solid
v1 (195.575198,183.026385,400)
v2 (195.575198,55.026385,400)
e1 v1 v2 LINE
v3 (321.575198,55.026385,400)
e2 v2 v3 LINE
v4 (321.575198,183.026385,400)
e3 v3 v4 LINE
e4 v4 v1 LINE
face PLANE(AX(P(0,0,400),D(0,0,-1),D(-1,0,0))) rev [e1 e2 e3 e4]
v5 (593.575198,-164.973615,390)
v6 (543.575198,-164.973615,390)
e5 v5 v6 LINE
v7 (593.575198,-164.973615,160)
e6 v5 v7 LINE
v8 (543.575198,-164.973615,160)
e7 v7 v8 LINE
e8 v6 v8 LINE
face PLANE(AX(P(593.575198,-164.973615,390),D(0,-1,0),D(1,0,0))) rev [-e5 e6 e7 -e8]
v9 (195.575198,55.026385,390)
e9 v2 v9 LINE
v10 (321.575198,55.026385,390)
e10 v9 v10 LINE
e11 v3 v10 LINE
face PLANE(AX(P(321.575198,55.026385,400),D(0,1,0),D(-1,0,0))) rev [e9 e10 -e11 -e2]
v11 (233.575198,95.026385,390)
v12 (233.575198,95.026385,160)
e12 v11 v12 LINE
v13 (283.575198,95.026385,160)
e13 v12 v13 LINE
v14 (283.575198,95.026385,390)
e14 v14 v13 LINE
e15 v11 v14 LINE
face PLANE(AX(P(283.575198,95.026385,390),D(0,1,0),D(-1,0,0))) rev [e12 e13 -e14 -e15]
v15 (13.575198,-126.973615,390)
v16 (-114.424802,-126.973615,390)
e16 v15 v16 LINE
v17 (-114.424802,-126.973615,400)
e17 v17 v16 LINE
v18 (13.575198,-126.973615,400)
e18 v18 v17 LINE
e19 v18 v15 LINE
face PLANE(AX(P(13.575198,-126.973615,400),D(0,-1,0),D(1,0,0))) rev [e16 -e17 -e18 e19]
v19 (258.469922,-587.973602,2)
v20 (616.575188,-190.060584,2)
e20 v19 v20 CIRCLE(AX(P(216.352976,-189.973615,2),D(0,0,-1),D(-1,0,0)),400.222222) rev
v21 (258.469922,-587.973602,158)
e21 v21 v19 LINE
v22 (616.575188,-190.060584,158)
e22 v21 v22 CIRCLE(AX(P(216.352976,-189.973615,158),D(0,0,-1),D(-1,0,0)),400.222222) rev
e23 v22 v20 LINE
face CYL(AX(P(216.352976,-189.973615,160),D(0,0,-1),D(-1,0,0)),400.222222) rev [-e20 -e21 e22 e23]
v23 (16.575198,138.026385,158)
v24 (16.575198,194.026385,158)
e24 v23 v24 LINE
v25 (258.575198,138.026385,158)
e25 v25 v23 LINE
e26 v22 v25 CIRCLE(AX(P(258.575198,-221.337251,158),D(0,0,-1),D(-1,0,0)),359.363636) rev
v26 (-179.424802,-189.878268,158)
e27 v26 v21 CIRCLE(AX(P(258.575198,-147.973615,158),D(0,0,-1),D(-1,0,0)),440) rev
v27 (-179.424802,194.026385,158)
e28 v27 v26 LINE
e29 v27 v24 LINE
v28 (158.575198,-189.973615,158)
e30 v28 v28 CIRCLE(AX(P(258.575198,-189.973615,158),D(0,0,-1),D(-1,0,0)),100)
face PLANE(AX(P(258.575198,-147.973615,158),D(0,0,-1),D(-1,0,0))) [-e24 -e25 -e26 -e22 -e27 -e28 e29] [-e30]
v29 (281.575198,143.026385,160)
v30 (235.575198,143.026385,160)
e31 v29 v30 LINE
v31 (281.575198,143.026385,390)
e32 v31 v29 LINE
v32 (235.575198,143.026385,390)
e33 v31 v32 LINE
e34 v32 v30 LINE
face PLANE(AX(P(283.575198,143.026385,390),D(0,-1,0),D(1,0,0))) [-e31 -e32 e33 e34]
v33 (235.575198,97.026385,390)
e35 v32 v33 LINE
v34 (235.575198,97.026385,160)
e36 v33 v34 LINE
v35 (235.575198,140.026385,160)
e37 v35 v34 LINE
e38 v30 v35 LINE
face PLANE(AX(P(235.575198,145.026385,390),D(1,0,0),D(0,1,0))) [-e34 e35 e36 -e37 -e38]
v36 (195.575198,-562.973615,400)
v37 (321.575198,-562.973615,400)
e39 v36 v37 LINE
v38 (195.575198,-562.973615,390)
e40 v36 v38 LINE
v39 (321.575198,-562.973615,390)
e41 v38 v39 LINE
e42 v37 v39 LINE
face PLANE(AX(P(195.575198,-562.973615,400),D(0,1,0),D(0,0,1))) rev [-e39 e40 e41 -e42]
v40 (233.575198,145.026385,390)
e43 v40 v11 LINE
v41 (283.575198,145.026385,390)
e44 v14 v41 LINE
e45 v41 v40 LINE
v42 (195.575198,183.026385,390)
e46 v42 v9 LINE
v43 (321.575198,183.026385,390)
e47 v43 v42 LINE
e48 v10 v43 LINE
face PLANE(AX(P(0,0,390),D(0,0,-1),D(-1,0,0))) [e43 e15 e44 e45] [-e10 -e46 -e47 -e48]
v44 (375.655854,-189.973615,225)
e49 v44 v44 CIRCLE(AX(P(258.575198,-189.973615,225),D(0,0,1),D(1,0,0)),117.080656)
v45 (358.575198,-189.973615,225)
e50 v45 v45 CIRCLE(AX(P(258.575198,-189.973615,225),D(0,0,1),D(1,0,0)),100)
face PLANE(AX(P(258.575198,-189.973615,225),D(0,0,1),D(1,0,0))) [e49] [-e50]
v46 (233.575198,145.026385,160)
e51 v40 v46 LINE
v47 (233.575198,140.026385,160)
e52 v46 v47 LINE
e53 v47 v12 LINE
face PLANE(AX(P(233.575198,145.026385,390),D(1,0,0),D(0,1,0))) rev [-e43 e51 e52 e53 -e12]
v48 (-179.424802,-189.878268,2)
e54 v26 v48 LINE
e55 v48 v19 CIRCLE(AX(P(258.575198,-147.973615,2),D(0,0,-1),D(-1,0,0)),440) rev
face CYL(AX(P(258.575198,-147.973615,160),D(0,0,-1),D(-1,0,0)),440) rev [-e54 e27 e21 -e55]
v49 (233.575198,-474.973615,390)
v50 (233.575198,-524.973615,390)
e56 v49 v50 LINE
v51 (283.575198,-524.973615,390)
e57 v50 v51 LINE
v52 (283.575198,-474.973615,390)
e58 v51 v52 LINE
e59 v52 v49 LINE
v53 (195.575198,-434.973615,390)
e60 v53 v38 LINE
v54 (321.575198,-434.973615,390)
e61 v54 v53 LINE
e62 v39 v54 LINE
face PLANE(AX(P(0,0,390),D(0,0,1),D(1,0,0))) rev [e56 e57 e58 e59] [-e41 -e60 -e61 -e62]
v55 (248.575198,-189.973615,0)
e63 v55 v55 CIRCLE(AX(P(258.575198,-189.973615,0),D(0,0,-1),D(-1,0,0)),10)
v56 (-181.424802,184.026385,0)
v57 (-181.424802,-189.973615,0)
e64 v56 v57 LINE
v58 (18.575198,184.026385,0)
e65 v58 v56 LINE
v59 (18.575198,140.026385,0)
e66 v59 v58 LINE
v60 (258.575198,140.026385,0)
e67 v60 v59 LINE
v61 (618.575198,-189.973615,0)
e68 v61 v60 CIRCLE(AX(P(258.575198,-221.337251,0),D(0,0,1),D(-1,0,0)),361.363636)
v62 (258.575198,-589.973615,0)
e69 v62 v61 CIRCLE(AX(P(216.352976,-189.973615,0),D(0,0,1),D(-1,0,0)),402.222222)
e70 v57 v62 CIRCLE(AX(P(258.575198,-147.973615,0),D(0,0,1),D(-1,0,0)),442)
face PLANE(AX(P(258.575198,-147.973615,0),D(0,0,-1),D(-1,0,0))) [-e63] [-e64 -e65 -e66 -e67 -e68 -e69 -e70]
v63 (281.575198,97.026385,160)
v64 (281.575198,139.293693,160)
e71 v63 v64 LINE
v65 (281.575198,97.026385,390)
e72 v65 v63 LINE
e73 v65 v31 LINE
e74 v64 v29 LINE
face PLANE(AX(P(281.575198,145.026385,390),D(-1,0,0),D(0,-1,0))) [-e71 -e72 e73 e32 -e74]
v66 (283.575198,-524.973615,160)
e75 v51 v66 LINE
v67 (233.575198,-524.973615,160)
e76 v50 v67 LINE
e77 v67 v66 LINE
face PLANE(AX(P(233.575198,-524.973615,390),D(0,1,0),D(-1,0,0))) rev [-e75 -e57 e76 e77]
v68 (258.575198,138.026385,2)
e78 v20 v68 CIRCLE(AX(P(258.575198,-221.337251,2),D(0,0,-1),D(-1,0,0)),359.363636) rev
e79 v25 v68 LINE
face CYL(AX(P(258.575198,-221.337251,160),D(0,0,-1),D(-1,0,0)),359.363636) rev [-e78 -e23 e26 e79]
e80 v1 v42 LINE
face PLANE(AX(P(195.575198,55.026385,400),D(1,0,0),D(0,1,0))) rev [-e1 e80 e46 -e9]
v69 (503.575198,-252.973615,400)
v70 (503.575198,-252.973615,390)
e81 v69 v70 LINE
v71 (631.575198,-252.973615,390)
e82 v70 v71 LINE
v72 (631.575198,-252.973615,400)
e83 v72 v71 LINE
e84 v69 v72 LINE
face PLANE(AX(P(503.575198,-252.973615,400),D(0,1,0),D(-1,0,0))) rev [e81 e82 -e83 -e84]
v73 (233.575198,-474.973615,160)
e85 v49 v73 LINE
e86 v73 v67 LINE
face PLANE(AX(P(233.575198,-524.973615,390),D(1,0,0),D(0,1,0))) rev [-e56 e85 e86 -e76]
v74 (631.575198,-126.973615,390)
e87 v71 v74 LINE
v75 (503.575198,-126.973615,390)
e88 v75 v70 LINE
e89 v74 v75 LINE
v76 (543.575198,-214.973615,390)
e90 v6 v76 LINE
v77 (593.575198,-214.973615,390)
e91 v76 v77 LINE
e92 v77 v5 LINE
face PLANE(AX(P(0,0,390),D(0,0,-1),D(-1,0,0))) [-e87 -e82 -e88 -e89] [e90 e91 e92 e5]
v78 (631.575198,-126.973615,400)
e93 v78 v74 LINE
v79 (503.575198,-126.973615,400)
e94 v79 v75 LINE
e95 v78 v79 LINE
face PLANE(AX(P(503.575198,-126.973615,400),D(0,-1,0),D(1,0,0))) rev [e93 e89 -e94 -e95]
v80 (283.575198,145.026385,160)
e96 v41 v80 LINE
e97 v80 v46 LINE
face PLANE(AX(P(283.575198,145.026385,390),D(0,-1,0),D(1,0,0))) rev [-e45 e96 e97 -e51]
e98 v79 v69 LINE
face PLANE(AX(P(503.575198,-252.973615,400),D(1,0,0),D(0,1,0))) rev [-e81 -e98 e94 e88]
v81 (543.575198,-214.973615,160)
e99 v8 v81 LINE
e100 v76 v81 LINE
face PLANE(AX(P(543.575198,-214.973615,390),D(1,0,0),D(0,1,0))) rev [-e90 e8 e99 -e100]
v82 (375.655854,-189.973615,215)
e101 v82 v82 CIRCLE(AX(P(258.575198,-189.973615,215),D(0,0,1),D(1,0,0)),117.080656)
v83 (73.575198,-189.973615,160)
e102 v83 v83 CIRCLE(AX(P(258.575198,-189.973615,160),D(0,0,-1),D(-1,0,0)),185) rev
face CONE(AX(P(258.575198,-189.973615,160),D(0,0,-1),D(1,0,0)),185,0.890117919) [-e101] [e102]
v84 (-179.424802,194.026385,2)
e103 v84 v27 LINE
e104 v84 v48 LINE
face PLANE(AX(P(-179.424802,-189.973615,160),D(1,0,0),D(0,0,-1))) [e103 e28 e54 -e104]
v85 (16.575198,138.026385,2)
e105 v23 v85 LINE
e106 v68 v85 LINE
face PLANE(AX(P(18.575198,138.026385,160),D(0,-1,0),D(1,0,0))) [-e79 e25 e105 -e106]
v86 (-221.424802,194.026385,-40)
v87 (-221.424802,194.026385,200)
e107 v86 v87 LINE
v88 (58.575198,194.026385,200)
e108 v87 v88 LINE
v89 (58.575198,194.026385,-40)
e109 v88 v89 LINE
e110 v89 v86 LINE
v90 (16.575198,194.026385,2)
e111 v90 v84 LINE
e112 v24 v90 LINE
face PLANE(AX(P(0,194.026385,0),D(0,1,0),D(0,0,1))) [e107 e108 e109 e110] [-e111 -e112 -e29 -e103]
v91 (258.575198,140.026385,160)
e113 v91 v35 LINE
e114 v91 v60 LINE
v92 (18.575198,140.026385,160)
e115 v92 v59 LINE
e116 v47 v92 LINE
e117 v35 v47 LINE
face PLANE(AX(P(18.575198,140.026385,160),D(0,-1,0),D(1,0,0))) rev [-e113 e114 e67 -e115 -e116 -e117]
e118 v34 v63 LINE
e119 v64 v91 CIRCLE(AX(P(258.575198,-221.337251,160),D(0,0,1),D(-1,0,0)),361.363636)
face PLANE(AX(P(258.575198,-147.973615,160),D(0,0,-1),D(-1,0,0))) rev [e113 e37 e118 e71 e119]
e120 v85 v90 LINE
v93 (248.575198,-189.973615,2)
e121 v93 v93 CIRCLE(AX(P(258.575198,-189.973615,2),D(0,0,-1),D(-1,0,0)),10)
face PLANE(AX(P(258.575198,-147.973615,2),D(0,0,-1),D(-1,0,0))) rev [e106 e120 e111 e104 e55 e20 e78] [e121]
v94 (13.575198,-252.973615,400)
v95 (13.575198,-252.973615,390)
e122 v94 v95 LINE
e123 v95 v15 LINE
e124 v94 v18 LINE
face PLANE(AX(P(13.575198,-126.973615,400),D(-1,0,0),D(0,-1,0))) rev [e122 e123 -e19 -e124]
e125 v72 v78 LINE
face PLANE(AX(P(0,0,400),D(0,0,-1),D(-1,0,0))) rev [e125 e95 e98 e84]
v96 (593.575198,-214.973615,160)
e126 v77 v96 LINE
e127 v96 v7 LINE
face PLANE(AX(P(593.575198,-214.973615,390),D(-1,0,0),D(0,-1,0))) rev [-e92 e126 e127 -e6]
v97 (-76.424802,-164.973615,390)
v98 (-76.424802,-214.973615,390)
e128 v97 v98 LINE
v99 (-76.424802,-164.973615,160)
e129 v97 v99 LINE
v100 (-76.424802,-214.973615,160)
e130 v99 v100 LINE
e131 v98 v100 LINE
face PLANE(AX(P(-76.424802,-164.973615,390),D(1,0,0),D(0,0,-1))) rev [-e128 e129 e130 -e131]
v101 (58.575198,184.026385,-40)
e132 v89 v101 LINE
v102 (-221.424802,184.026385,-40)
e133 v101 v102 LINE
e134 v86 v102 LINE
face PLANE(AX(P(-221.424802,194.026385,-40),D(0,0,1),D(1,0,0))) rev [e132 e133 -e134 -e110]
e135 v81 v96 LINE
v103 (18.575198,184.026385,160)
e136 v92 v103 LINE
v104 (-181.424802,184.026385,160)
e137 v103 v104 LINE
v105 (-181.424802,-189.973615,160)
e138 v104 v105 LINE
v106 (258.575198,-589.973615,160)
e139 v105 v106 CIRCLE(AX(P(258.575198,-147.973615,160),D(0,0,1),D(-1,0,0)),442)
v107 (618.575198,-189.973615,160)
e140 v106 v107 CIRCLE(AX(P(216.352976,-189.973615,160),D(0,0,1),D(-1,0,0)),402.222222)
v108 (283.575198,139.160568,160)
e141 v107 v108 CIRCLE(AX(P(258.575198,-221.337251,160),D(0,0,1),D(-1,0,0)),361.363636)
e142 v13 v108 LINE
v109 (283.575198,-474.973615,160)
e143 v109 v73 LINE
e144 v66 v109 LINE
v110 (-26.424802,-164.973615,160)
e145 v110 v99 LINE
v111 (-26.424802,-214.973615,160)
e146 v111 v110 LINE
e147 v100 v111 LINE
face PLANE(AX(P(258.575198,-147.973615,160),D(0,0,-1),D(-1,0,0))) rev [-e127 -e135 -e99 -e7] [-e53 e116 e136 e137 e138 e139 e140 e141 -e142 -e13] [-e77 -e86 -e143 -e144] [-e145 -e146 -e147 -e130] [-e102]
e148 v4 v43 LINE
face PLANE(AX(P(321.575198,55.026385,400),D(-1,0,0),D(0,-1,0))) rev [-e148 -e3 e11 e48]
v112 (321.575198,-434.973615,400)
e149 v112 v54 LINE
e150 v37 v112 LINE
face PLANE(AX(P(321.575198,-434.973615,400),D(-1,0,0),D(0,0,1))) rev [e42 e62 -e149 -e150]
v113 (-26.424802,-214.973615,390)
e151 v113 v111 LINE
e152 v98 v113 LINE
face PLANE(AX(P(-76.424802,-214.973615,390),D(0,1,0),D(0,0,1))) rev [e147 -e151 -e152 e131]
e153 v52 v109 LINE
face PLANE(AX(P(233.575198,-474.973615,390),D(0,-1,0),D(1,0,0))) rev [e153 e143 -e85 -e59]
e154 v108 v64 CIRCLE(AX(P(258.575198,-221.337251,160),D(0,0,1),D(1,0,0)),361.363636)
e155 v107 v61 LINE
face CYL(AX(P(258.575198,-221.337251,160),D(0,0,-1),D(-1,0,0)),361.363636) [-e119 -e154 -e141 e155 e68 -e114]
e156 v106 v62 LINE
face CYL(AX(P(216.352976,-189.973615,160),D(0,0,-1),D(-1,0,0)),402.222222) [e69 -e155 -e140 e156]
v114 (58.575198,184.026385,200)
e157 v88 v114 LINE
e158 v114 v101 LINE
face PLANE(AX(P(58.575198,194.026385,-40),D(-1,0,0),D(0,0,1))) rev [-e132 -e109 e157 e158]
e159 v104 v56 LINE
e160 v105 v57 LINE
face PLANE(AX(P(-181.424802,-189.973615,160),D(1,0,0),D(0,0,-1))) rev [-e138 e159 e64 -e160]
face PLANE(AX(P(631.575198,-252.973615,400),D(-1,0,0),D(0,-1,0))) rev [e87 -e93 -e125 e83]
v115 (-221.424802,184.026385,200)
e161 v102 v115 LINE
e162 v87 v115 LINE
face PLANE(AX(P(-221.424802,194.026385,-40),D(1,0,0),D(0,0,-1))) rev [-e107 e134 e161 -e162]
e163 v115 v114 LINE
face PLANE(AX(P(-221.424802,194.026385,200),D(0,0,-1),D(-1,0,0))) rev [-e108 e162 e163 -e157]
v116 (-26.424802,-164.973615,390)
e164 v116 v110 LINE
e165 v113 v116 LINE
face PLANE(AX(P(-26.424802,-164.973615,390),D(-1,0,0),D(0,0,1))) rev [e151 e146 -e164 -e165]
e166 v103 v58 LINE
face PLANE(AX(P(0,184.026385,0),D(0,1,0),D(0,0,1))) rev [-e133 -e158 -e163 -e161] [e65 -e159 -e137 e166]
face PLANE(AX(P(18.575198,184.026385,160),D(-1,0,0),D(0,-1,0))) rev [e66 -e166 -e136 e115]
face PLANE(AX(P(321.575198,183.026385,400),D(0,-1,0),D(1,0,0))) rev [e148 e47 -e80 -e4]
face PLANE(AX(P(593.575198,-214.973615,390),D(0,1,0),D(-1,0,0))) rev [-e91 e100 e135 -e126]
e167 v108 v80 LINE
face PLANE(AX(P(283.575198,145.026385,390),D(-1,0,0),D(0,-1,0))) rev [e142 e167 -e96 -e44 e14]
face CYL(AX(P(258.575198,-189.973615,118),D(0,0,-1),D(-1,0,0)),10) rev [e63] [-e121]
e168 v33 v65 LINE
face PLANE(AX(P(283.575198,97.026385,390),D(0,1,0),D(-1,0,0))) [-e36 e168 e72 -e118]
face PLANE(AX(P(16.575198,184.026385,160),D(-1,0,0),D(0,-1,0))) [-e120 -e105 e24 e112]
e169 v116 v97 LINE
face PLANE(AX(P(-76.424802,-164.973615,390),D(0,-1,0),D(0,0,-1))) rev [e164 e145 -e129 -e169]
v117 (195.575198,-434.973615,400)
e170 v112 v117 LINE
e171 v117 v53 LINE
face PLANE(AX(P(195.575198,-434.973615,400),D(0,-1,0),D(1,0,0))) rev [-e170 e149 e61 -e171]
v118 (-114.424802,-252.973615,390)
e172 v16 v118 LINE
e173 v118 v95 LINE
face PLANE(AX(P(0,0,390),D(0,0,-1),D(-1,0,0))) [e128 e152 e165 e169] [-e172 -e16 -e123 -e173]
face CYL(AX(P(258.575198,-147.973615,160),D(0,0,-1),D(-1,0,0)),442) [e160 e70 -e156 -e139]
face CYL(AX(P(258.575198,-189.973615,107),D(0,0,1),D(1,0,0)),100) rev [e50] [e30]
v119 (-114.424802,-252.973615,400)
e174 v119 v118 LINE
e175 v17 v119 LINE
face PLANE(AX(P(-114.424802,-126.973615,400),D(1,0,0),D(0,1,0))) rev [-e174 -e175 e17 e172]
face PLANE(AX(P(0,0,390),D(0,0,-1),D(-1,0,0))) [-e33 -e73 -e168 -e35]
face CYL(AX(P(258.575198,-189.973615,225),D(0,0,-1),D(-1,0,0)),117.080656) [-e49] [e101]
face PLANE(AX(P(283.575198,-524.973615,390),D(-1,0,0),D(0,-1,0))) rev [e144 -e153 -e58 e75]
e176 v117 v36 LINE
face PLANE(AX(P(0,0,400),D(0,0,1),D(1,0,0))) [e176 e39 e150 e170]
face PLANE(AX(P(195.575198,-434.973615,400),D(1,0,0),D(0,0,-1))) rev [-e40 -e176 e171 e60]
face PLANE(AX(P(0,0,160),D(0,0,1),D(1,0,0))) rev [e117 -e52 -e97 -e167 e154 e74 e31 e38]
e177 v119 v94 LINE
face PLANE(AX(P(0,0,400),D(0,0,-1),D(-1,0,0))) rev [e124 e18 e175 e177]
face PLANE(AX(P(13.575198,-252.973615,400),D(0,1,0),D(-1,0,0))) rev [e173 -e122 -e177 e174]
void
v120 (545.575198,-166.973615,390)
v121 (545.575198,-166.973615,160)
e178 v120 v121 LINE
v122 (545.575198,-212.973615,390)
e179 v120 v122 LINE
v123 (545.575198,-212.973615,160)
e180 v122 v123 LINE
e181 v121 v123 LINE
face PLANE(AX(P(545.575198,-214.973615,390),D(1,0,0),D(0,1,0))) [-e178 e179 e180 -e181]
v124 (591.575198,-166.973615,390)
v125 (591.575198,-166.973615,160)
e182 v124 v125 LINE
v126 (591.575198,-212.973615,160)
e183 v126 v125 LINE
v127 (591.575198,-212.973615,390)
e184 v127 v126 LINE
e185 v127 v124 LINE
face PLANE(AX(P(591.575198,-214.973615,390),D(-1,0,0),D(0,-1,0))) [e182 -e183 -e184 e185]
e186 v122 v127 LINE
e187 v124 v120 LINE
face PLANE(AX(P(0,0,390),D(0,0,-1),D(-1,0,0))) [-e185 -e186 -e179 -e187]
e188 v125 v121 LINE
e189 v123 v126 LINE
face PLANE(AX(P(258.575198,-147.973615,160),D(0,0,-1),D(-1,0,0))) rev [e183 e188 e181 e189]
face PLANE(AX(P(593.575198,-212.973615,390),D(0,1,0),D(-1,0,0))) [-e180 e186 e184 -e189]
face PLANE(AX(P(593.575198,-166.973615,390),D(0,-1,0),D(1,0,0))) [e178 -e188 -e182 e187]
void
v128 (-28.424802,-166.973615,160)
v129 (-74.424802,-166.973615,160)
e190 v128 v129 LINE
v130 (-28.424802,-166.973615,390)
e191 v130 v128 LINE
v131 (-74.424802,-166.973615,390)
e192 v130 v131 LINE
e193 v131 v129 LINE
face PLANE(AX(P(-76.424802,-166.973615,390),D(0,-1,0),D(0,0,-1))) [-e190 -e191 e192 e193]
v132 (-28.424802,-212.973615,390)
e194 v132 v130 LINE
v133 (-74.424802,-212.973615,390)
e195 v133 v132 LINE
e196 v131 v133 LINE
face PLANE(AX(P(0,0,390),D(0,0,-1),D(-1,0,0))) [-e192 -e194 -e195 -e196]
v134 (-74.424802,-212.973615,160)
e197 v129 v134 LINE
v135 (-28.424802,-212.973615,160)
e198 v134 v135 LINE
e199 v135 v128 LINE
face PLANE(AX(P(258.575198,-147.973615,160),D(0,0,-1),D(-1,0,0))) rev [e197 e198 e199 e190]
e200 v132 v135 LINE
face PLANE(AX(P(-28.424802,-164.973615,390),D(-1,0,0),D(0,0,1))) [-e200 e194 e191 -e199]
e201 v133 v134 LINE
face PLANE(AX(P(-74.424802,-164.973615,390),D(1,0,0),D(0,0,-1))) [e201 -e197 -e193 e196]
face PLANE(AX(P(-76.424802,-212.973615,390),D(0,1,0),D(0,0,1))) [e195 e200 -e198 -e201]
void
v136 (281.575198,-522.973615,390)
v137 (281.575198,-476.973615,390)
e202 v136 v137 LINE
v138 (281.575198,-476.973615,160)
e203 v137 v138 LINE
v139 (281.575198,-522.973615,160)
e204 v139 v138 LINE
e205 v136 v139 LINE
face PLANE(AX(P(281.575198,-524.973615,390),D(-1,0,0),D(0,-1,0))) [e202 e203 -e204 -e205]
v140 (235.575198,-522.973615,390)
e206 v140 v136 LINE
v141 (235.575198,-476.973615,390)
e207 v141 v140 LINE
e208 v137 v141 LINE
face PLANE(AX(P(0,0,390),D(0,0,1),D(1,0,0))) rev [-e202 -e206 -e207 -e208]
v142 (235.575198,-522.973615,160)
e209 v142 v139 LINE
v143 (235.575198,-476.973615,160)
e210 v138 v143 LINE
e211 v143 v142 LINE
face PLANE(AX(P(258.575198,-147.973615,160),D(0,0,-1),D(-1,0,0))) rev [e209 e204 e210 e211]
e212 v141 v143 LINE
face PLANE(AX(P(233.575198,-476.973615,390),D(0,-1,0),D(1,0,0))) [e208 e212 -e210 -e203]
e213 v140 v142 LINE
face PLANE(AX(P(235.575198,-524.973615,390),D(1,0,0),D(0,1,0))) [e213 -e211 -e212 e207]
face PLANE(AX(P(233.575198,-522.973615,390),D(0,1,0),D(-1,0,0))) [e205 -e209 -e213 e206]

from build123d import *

# Parameters (mm, degrees)
BOSS_EXTRUDE1_DEPTH       = 160
SHELL4_START              = 2
SHELL4_DEPTH              = 156
SKETCH5_R                 = 90
CUT_EXTRUDE1_DEPTH        = 118
SKETCH6_R                 = 185
BOSS_EXTRUDE2_DEPTH       = 55
BOSS_EXTRUDE2_TAPER       = 51
SKETCH7_R                 = 117.080656391
BOSS_EXTRUDE3_DEPTH       = 10
SKETCH9_R                 = 100
CUT_EXTRUDE2_DEPTH        = 118
SKETCH11_R                = 10
CUT_EXTRUDE3_DEPTH        = 118
SKETCH12_W                = 280
SKETCH12_H                = 240
SKETCH12_W_2              = 196
SKETCH12_H_2              = 156
BOSS_EXTRUDE4_DEPTH       = 10
EXTRUDE_THIN1_OUTLINE_W   = 50
EXTRUDE_THIN1_OUTLINE_H   = 50
EXTRUDE_THIN1_OUTLINE_W_2 = 46
EXTRUDE_THIN1_OUTLINE_H_2 = 46
EXTRUDE_THIN1_DEPTH       = 230
BOSS_EXTRUDE6_START       = 230
SKETCH15_W                = 126
SKETCH15_H                = 128
SKETCH15_W_2              = 128
SKETCH15_H_2              = 126
BOSS_EXTRUDE6_DEPTH       = 10


# Read off the part's stored shape, not the designer's step: Shell4, Extrude-Thin1
with BuildPart() as part:
    # Sketch1 → Boss-Extrude1 (new body)
    with BuildSketch(Plane.XY):
        with BuildLine():
            Line((-181.424802111, -189.973614776), (-181.424802111, 184.026385224))
            Line((-181.424802111, 184.026385224), (18.575197889, 184.026385224))
            Line((18.575197889, 184.026385224), (18.575197889, 140.026385224))
            Line((18.575197889, 140.026385224), (258.575197889, 140.026385224))
            ThreePointArc((258.575197889, 140.026385224), (502.757506831, 45.043449524), (618.575197889, -189.973614776))
            ThreePointArc((618.575197889, -189.973614776), (515.322398935, -459.046095717), (258.575197889, -589.973614776))
            ThreePointArc((258.575197889, -589.973614776), (-38.746177057, -475.027127217), (-181.424802111, -189.973614776))
        make_face()
    extrude(amount=BOSS_EXTRUDE1_DEPTH)

    # Shell4 outline → Shell4 (cut)
    with BuildSketch(Plane.XY.offset(SHELL4_START)):
        with BuildLine():
            ThreePointArc((-179.424802111, -189.878268455), (-37.404584917, -473.543834805), (258.469922203, -587.973602181))
            ThreePointArc((258.469922203, -587.973602181), (513.841925832, -457.701371443), (616.57518844, -190.060584018))
            ThreePointArc((616.57518844, -190.060584018), (501.374009985, 43.598514633), (258.575197889, 138.026385224))
            Line((258.575197889, 138.026385224), (16.575197889, 138.026385224))
            Line((16.575197889, 138.026385224), (16.575197889, 184.026385224))
            Line((16.575197889, 184.026385224), (-179.424802111, 184.026385224))
            Line((-179.424802111, 184.026385224), (-179.424802111, -189.878268455))
        make_face()
    extrude(amount=SHELL4_DEPTH, mode=Mode.SUBTRACT)

    # Sketch5 → Cut-Extrude1 (cut)
    with BuildSketch(Plane.XY.offset(160)):
        with Locations((258.575197889, -189.973614776)):
            Circle(SKETCH5_R)
    extrude(amount=-CUT_EXTRUDE1_DEPTH, mode=Mode.SUBTRACT)

    # Sketch6 → Boss-Extrude2 (add)
    with BuildSketch(Plane.XY.offset(160)):
        with Locations((258.575197889, -189.973614776)):
            Circle(SKETCH6_R)
    extrude(amount=BOSS_EXTRUDE2_DEPTH, taper=BOSS_EXTRUDE2_TAPER)

    # Sketch7 → Boss-Extrude3 (add)
    with BuildSketch(Plane.XY.offset(215)):
        with Locations((258.575197889, -189.973614776)):
            Circle(SKETCH7_R)
    extrude(amount=BOSS_EXTRUDE3_DEPTH)

    # Sketch9 → Cut-Extrude2 (cut)
    with BuildSketch(Plane.XY.offset(225)):
        with Locations((258.575197889, -189.973614776)):
            Circle(SKETCH9_R)
    extrude(amount=-CUT_EXTRUDE2_DEPTH, mode=Mode.SUBTRACT)

    # Sketch11 → Cut-Extrude3 (cut)
    with BuildSketch(Plane(origin=(0, 0, 0), x_dir=(-1, 0, 0), z_dir=(0, 0, -1))):
        with Locations((-258.575197889, -189.973614776)):
            Circle(SKETCH11_R)
    extrude(amount=-CUT_EXTRUDE3_DEPTH, mode=Mode.SUBTRACT)

    # Sketch12 → Boss-Extrude4 (add)
    with BuildSketch(Plane(origin=(0, 184.026385224, 0), x_dir=(1, 0, 0), z_dir=(0, 1, 0))):
        with Locations((-81.424802111, -80)):
            Rectangle(SKETCH12_W, SKETCH12_H)
        with Locations((-81.424802111, -80)):
            Rectangle(SKETCH12_W_2, SKETCH12_H_2, mode=Mode.SUBTRACT)
    extrude(amount=BOSS_EXTRUDE4_DEPTH)

    # Extrude-Thin1 outline → Extrude-Thin1 (add)
    # profile 1 of 4: a face of its own
    with BuildSketch(Plane.XY.offset(160)):
        with Locations((-51.424802111, -189.973614776)):
            Rectangle(EXTRUDE_THIN1_OUTLINE_W, EXTRUDE_THIN1_OUTLINE_H)
        with Locations((-51.424802111, -189.973614776)):
            Rectangle(EXTRUDE_THIN1_OUTLINE_W_2, EXTRUDE_THIN1_OUTLINE_H_2, mode=Mode.SUBTRACT)
    # profile 2 of 4: a face of its own
    with BuildSketch(Plane.XY.offset(160)):
        with Locations((568.575197889, -189.973614776)):
            Rectangle(EXTRUDE_THIN1_OUTLINE_W, EXTRUDE_THIN1_OUTLINE_H)
        with Locations((568.575197889, -189.973614776)):
            Rectangle(EXTRUDE_THIN1_OUTLINE_W_2, EXTRUDE_THIN1_OUTLINE_H_2, mode=Mode.SUBTRACT)
    # profile 3 of 4: a face of its own
    with BuildSketch(Plane.XY.offset(160)):
        with Locations((258.575197889, 120.026385224)):
            Rectangle(EXTRUDE_THIN1_OUTLINE_W, EXTRUDE_THIN1_OUTLINE_H)
        with Locations((258.575197889, 120.026385224)):
            Rectangle(EXTRUDE_THIN1_OUTLINE_W_2, EXTRUDE_THIN1_OUTLINE_H_2, mode=Mode.SUBTRACT)
    # profile 4 of 4: a face of its own
    with BuildSketch(Plane.XY.offset(160)):
        with Locations((258.575197889, -499.973614776)):
            Rectangle(EXTRUDE_THIN1_OUTLINE_W, EXTRUDE_THIN1_OUTLINE_H)
        with Locations((258.575197889, -499.973614776)):
            Rectangle(EXTRUDE_THIN1_OUTLINE_W_2, EXTRUDE_THIN1_OUTLINE_H_2, mode=Mode.SUBTRACT)
    extrude(amount=EXTRUDE_THIN1_DEPTH)

    # Sketch15 → Boss-Extrude6 (add)
    with BuildSketch(Plane.XY.offset(160).offset(BOSS_EXTRUDE6_START)):
        with Locations((258.575197889, -498.973614776)):
            Rectangle(SKETCH15_W, SKETCH15_H)
        with Locations((-50.424802111, -189.973614776)):
            Rectangle(SKETCH15_W_2, SKETCH15_H_2)
        with Locations((258.575197889, 119.026385224)):
            Rectangle(SKETCH15_W, SKETCH15_H)
        with Locations((567.575197889, -189.973614776)):
            Rectangle(SKETCH15_W_2, SKETCH15_H_2)
    extrude(amount=BOSS_EXTRUDE6_DEPTH)


solid = part.part
